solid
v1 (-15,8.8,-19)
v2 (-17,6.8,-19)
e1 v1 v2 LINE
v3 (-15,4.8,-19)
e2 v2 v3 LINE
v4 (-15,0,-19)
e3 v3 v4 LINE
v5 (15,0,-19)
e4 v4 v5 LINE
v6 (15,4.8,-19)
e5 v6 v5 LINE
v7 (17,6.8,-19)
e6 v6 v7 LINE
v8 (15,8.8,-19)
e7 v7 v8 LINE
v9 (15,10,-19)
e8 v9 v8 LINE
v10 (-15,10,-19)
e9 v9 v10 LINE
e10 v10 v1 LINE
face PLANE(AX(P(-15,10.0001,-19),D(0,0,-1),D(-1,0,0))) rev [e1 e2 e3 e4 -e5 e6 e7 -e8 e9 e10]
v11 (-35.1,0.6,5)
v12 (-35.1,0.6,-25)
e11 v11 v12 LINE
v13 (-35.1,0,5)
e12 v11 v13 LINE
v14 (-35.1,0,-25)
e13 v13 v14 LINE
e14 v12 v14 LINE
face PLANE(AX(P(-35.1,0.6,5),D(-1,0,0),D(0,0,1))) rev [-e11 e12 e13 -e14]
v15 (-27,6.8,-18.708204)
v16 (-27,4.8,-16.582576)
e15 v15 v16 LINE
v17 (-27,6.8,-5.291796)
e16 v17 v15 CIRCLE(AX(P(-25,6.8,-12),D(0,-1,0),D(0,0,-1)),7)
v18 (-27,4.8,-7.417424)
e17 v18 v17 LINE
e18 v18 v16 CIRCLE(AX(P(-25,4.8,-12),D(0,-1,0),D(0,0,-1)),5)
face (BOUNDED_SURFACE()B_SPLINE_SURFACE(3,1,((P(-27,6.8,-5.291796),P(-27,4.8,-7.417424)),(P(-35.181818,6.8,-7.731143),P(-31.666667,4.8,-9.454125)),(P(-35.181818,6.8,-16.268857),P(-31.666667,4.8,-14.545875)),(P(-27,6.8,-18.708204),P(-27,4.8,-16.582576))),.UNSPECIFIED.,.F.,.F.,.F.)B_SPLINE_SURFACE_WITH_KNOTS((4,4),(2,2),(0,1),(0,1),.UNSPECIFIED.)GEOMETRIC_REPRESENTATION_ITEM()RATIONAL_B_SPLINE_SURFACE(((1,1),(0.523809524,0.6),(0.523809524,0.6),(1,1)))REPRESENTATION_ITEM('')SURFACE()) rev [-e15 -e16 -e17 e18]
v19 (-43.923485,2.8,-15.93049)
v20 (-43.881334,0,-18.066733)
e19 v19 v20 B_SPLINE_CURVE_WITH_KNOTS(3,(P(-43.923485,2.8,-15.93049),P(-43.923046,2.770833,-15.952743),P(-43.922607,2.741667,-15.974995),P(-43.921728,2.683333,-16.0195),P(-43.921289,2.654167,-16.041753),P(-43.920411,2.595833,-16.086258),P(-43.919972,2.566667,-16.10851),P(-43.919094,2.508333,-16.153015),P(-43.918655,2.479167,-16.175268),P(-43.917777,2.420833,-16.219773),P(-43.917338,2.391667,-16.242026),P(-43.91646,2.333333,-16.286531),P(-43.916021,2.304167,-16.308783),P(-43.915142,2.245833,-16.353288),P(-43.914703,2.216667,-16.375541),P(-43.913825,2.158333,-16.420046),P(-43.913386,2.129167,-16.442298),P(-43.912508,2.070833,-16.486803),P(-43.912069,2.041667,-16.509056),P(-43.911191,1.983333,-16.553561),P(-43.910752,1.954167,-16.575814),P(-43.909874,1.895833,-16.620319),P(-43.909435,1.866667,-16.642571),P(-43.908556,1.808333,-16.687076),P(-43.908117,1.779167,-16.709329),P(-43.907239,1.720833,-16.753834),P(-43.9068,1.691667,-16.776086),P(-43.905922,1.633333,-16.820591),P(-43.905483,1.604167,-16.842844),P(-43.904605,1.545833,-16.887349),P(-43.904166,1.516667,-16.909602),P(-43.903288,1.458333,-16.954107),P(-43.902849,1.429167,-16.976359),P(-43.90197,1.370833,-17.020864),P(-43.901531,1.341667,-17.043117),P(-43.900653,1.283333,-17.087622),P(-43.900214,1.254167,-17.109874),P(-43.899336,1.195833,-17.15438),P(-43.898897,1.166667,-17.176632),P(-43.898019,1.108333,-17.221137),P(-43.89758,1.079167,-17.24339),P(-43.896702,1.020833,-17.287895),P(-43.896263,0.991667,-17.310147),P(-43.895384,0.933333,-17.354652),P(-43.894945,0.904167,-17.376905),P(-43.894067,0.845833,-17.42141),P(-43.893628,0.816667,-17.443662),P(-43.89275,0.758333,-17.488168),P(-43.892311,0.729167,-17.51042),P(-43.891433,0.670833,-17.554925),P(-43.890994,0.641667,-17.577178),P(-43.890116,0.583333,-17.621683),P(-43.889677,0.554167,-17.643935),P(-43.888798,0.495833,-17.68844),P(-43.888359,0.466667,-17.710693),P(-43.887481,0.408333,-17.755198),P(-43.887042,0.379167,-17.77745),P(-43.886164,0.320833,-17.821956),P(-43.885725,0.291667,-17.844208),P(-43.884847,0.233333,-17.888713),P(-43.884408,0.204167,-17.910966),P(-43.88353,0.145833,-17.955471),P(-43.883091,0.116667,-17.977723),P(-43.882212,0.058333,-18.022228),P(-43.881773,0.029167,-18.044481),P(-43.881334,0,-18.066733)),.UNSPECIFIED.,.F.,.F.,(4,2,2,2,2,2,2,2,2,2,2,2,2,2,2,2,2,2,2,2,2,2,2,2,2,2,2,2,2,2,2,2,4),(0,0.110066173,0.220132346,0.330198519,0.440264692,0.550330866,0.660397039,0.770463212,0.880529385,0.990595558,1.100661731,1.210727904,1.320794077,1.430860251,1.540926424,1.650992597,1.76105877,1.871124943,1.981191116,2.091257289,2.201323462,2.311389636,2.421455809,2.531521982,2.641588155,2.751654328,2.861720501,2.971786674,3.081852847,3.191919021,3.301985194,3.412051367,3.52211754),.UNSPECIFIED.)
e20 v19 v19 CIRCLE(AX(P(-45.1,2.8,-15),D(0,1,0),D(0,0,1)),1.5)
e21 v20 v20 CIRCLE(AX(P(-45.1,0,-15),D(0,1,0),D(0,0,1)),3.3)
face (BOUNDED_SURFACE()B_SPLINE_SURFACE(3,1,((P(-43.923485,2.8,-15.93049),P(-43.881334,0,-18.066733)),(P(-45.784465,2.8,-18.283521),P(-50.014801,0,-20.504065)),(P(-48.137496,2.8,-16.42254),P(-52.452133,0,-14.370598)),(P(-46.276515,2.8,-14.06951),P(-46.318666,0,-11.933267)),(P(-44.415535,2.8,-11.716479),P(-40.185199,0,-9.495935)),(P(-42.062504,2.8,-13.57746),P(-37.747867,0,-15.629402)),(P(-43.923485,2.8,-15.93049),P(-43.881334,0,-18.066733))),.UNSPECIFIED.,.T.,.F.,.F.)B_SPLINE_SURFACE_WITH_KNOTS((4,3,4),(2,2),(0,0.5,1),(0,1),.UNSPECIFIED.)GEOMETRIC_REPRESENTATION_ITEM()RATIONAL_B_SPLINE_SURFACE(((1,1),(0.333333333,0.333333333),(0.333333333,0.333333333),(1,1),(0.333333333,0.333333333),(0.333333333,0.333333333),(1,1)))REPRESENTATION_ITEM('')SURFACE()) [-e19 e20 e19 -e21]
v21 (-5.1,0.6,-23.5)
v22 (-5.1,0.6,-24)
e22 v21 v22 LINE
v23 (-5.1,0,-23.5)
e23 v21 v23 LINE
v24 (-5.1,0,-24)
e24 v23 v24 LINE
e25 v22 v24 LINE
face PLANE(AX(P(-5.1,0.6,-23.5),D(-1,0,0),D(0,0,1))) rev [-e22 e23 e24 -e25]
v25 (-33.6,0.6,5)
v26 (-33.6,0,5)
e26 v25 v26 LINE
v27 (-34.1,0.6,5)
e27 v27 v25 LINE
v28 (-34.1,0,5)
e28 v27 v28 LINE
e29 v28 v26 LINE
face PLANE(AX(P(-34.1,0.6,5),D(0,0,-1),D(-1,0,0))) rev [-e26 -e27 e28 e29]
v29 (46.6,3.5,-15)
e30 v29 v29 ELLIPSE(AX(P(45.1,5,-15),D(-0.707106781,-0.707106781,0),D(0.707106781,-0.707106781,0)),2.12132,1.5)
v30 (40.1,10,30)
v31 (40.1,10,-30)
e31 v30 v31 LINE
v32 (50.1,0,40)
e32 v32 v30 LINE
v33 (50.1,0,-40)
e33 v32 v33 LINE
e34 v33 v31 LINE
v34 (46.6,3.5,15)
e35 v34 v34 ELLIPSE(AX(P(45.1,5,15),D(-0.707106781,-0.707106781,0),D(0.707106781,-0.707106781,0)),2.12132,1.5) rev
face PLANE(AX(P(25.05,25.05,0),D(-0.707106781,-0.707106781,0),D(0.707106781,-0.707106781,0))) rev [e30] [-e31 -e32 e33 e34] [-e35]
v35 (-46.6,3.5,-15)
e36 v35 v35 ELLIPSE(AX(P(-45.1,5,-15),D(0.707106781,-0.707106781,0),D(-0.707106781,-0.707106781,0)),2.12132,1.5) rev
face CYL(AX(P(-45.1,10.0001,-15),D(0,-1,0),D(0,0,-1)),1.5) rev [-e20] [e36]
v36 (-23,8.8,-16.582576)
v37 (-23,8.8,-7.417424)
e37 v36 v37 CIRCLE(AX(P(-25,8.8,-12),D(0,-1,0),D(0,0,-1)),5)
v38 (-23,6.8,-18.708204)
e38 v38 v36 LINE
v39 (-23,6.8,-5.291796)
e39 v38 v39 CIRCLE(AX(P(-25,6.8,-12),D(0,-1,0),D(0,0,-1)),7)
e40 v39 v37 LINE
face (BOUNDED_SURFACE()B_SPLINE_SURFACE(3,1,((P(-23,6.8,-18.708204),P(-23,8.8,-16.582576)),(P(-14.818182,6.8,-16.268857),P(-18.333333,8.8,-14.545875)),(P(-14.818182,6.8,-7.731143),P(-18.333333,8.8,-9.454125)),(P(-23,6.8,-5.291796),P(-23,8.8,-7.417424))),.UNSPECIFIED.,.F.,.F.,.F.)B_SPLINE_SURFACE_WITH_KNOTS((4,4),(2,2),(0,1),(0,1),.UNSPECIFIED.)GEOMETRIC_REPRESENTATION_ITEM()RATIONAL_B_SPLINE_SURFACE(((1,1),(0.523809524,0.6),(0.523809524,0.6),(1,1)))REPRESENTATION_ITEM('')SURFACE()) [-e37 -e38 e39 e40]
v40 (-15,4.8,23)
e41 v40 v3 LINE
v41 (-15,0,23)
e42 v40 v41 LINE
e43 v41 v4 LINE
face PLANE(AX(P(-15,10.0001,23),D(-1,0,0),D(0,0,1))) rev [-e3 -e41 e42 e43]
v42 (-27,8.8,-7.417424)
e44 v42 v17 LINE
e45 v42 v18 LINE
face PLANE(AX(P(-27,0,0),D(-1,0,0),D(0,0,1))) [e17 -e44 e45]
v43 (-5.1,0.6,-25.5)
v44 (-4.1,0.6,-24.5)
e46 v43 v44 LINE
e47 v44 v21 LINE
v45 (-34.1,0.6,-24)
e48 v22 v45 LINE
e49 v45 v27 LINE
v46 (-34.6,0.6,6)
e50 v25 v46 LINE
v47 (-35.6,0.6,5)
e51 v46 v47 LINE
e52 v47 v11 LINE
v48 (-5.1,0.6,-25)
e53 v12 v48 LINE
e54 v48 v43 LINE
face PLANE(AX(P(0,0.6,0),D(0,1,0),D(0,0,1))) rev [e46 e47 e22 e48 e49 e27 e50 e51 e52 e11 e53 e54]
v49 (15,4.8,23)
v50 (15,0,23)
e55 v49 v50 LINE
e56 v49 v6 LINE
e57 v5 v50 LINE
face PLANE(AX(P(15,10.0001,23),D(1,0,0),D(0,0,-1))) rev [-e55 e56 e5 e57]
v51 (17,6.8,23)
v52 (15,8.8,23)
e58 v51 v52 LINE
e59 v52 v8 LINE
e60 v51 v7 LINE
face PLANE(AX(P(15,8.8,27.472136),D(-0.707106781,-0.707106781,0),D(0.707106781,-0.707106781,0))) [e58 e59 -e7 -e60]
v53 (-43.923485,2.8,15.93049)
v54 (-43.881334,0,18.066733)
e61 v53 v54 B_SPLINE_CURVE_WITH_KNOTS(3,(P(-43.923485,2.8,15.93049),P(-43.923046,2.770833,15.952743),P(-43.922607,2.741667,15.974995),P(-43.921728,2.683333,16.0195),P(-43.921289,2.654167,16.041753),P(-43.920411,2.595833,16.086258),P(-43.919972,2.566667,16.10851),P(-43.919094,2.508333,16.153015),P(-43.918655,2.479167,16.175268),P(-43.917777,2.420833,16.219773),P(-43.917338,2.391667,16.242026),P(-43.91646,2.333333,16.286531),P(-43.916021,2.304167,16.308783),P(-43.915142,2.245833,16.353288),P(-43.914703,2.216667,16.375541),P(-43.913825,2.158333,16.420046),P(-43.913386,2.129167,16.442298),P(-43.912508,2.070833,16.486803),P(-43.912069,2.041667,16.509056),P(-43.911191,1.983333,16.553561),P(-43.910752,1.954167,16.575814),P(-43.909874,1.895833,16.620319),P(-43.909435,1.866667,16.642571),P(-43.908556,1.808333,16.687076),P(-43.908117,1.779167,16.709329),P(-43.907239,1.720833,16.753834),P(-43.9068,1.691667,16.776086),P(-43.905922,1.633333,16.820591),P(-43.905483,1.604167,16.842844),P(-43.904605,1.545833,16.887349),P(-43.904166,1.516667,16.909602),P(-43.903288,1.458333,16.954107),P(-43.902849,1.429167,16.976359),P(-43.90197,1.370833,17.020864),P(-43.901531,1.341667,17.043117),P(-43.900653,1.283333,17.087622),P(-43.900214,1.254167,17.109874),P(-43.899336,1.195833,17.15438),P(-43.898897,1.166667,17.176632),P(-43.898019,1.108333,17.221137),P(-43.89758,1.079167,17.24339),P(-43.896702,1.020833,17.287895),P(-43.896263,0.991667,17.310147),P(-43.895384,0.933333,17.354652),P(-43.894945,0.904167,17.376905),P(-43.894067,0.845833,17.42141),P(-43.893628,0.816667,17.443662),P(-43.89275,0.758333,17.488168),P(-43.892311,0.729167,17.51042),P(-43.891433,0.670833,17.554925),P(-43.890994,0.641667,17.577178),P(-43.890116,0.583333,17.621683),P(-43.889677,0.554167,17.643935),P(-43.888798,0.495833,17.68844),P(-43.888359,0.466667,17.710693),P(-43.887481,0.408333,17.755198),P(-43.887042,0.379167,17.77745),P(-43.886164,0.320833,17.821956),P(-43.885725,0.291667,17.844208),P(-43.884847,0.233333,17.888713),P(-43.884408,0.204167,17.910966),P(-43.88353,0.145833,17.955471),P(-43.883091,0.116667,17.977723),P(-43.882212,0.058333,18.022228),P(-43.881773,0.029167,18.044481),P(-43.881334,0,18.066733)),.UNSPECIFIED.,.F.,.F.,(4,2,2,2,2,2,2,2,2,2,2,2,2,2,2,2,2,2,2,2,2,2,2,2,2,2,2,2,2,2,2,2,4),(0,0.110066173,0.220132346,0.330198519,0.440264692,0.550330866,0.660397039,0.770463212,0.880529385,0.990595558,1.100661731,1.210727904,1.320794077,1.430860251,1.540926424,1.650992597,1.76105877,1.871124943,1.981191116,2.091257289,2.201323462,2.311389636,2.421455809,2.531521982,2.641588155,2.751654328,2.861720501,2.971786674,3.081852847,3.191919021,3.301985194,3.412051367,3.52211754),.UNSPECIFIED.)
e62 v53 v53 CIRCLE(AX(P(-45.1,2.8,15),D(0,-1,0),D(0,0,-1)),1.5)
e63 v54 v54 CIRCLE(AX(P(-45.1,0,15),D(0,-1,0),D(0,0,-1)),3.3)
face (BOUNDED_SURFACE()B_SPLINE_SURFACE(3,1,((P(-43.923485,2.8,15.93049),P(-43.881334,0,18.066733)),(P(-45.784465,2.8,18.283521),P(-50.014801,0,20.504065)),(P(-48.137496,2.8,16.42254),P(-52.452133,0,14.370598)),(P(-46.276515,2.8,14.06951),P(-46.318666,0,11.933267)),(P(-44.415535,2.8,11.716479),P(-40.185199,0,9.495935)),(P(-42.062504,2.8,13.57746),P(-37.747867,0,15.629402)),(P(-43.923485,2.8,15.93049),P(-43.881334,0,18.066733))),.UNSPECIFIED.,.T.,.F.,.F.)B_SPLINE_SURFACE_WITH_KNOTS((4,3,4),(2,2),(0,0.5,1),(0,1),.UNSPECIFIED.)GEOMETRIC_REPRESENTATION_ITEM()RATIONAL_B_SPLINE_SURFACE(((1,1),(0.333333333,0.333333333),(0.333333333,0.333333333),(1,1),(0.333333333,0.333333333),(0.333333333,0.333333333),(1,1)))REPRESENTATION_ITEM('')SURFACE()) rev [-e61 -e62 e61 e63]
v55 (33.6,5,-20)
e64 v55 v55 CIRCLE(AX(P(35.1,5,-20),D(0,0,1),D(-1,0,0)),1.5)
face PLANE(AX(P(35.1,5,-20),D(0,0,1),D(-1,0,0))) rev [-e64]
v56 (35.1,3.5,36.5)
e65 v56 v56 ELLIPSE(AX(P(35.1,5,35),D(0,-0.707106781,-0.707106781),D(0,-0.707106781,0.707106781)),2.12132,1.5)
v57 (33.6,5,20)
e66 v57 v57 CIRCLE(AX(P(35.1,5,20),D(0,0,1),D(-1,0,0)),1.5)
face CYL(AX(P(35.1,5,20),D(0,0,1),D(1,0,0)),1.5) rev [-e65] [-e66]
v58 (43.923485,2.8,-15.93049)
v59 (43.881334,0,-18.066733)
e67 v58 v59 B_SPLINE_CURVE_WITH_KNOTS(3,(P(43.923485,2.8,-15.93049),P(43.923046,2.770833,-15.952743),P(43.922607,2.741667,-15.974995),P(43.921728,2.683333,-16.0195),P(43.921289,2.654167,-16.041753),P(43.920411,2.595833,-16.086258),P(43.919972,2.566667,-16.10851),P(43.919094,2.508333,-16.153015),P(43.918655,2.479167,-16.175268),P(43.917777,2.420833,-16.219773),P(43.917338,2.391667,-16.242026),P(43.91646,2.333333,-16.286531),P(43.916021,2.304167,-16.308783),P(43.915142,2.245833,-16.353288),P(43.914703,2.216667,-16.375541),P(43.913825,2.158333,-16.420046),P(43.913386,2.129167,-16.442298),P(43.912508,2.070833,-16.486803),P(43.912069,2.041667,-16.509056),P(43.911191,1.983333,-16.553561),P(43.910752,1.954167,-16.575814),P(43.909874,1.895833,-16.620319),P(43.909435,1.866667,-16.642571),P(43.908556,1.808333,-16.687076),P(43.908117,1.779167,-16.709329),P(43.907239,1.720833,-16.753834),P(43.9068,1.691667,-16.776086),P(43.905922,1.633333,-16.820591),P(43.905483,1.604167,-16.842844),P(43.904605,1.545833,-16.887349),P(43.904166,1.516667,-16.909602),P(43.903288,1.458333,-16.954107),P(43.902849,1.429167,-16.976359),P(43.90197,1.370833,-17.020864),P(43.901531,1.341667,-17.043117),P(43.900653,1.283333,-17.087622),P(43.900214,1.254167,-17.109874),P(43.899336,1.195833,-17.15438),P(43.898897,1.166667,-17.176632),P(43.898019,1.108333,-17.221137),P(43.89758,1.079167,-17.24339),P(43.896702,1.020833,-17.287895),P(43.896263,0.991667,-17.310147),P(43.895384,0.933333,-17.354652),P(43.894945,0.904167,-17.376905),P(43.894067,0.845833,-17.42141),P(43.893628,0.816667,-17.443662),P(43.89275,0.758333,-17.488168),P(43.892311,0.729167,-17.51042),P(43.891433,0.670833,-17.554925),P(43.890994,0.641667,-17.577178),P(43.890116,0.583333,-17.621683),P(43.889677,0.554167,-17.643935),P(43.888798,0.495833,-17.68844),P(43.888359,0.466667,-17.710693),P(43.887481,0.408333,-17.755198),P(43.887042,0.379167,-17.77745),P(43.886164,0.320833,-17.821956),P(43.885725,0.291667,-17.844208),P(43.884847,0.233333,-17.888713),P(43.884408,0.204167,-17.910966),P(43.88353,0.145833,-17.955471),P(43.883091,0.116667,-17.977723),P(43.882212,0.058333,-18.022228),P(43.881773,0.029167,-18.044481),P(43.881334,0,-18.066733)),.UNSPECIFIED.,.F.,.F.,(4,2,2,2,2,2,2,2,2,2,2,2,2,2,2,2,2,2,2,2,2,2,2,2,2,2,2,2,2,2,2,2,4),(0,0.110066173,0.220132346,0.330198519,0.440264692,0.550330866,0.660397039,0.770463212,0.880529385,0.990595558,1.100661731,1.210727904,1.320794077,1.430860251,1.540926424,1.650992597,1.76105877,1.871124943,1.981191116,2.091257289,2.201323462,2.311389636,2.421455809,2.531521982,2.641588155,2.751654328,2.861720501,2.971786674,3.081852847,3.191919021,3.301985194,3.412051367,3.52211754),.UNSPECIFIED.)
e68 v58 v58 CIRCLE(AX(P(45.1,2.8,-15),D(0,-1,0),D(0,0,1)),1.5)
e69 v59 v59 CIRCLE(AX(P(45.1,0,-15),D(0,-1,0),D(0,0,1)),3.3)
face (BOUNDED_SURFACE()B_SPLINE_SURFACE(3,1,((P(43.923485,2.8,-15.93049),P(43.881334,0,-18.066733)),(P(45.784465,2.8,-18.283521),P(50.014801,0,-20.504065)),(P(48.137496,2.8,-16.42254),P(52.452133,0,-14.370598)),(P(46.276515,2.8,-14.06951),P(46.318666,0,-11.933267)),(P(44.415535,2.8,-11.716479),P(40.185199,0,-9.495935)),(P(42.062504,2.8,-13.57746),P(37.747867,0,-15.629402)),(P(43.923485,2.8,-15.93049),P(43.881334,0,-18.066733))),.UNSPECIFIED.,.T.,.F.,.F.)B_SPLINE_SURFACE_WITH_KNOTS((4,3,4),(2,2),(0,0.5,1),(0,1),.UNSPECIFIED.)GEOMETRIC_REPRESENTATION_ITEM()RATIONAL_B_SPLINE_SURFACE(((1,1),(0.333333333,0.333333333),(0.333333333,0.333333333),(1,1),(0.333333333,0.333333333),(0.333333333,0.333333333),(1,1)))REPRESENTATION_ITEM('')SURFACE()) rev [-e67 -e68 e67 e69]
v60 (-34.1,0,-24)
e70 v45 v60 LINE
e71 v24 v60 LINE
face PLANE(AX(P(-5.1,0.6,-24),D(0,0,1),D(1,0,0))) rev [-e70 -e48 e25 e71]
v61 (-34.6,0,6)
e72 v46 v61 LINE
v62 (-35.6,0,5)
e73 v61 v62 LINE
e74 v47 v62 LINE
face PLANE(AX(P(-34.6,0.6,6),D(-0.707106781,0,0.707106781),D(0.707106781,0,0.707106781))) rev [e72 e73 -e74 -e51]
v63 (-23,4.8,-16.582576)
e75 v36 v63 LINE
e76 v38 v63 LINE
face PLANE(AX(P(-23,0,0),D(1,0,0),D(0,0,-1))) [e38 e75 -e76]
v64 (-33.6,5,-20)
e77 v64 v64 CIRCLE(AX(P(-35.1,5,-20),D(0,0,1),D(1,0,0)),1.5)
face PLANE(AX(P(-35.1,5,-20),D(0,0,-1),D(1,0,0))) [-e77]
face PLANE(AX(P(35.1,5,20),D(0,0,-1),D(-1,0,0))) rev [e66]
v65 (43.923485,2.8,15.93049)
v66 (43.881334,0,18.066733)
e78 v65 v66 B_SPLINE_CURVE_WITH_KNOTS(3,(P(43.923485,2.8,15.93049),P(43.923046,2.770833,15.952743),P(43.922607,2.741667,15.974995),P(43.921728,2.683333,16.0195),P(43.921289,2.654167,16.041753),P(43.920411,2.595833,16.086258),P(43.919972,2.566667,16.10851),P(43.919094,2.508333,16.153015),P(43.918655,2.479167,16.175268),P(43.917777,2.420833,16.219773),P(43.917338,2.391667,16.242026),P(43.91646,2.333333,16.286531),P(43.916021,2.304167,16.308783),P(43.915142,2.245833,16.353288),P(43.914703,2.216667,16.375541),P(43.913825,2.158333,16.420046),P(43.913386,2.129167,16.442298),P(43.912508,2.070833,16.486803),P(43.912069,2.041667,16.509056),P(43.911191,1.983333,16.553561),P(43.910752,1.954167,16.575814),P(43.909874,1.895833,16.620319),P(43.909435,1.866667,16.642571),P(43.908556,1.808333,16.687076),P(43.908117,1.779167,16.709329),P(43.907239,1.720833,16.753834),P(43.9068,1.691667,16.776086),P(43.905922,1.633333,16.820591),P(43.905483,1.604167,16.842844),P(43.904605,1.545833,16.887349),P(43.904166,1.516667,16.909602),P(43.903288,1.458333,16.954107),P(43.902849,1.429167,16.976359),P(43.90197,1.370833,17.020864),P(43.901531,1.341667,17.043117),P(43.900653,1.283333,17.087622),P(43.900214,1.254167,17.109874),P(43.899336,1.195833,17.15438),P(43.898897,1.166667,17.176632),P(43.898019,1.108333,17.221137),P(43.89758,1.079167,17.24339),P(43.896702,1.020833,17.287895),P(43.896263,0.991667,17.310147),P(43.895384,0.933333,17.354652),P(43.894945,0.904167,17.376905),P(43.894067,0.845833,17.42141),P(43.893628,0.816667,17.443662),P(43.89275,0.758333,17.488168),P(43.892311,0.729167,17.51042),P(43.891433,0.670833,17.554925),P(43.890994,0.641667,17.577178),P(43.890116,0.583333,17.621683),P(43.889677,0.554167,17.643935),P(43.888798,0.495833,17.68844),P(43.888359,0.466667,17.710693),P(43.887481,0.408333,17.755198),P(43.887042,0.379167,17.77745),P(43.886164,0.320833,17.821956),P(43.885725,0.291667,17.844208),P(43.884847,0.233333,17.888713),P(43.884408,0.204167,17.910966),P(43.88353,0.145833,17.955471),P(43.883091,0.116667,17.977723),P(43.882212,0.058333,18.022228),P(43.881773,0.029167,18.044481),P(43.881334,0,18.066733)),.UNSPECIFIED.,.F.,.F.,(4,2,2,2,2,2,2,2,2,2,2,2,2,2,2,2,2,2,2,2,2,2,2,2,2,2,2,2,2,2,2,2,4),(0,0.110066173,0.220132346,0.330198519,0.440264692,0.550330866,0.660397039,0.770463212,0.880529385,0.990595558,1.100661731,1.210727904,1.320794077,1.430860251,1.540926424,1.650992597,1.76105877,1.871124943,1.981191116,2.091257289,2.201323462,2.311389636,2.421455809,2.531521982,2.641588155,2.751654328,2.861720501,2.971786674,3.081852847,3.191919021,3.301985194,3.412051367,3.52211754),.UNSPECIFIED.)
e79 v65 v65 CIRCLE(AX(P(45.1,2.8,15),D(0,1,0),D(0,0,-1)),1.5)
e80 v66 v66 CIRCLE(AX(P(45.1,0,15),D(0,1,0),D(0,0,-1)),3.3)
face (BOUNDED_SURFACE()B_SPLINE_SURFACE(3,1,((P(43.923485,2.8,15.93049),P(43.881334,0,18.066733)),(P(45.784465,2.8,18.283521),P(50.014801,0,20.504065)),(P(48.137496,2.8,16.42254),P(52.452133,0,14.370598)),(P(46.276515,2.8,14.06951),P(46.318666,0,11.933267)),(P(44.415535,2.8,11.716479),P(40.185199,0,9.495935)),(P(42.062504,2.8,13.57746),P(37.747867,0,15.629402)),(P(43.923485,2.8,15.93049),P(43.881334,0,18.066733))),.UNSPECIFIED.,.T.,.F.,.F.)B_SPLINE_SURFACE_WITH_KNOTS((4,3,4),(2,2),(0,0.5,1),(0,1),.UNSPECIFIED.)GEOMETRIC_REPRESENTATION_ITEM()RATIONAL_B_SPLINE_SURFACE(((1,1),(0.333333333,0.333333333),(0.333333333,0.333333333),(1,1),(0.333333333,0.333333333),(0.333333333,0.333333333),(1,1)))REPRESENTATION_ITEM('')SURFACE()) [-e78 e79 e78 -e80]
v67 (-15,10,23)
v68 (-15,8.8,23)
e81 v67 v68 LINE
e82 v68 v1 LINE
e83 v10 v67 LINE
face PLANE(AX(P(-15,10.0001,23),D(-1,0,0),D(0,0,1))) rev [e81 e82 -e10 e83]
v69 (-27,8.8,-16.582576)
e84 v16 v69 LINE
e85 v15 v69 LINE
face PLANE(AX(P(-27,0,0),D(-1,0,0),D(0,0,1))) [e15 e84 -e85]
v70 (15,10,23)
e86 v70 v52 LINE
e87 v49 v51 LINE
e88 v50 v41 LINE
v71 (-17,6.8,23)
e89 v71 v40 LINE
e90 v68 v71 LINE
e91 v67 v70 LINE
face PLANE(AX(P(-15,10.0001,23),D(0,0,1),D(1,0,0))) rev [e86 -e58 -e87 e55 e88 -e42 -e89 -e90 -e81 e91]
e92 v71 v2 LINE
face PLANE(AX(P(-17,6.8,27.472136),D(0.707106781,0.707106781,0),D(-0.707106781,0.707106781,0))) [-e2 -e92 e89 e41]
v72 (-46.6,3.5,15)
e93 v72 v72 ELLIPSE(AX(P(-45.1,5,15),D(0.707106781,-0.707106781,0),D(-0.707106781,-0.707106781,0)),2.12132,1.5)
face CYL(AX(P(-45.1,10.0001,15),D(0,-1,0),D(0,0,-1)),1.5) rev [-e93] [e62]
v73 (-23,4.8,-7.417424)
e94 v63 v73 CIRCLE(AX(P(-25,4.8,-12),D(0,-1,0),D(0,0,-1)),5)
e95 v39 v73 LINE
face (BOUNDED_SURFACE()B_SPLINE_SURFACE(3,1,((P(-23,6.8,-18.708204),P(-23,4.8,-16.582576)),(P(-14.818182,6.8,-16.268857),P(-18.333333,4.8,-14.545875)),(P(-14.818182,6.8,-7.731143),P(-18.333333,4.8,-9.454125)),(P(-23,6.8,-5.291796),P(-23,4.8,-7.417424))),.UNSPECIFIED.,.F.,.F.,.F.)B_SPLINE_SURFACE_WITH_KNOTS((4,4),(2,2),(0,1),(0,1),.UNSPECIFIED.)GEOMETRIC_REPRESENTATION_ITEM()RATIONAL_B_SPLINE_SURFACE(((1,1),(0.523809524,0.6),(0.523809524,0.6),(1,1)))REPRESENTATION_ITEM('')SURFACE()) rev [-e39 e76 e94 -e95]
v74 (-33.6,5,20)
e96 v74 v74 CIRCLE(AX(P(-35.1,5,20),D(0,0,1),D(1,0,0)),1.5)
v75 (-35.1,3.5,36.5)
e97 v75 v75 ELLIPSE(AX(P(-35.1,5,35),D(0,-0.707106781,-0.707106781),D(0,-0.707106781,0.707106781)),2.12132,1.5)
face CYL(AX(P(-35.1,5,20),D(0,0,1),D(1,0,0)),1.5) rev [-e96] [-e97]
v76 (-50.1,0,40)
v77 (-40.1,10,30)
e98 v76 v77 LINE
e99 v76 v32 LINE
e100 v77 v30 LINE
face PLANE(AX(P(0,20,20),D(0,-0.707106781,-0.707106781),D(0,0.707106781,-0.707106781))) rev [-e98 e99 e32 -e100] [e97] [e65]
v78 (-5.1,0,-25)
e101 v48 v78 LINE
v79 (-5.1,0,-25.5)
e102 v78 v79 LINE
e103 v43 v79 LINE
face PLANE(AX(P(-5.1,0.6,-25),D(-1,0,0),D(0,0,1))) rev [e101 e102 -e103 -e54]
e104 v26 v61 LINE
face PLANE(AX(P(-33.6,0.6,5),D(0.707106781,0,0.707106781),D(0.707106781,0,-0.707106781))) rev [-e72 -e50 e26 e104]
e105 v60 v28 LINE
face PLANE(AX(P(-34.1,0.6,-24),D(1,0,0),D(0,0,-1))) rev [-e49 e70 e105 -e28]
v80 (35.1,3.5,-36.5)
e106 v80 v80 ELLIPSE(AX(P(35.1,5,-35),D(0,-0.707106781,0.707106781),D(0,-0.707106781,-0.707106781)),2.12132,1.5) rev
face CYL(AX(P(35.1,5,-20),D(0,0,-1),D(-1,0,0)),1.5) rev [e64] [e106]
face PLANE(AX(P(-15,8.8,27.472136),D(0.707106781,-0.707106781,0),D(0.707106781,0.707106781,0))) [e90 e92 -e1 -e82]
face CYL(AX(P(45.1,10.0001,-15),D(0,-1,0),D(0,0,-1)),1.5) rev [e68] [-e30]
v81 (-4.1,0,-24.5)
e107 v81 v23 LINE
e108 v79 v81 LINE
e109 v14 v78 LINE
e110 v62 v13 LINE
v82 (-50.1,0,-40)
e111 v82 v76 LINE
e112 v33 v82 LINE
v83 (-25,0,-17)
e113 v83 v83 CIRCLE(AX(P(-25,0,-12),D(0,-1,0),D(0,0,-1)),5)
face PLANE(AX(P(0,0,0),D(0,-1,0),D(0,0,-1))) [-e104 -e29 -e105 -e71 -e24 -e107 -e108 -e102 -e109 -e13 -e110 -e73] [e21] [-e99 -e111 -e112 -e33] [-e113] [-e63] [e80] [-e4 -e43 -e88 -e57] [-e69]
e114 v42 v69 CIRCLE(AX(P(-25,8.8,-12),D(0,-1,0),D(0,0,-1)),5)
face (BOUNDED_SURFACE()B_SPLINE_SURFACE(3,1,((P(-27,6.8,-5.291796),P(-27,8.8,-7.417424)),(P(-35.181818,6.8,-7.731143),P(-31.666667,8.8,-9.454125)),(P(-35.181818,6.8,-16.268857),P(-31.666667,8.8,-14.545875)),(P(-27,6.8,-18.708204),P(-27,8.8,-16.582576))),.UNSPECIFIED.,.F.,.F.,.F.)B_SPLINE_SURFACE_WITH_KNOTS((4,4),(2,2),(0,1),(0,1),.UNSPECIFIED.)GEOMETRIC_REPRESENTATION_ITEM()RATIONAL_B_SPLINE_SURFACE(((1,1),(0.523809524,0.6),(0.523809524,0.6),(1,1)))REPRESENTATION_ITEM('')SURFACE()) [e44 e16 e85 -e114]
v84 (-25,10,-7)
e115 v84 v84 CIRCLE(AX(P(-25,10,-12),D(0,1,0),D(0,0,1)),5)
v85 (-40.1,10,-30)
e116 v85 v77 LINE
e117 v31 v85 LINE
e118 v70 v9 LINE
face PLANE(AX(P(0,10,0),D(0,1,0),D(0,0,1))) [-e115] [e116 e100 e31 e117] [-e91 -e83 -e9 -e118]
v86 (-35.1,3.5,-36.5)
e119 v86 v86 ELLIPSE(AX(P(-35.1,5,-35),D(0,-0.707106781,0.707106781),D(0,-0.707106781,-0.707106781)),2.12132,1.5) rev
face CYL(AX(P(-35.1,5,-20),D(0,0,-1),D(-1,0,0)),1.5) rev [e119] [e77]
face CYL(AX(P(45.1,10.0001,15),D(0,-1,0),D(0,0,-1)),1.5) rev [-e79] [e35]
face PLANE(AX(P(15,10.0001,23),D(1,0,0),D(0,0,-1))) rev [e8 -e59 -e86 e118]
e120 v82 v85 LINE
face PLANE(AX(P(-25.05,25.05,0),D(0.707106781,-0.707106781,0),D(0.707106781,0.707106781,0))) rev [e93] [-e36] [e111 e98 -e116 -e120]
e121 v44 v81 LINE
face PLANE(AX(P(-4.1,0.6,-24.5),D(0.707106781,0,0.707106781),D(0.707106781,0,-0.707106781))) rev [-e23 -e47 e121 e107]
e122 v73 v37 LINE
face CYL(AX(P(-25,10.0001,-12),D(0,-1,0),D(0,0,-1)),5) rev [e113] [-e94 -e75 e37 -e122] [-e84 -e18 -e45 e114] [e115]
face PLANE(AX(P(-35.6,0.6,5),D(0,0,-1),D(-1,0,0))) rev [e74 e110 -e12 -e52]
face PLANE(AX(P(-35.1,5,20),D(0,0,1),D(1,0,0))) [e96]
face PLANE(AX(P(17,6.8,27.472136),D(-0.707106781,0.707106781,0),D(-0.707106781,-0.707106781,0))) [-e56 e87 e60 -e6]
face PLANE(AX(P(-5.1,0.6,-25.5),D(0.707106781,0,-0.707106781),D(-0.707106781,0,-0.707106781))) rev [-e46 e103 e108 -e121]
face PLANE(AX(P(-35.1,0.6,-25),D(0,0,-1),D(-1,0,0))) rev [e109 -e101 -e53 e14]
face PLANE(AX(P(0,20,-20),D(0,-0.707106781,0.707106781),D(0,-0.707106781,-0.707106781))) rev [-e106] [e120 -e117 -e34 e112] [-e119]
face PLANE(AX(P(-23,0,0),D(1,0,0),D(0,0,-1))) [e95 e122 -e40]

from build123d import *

# Parameters (mm, degrees)
SKETCH_4_R          = 1.5
CUT_EXTRUDE_1_DEPTH = 20
SKETCH_5_R          = 1.5
CUT_EXTRUDE_2_DEPTH = 65.884590004
SKETCH3_R           = 5
SKETCH3_W           = 30
SKETCH3_H           = 42
CUT_EXTRUDE1_DEPTH  = 65.884590004
CUT_EXTRUDE2_DEPTH  = 42
CUT_EXTRUDE_3_DEPTH = 0.6


with BuildPart() as part:
    # Эскиз1 → Loft 1 section 0
    with BuildSketch(Plane(origin=(0, 0, 0), x_dir=(1, 0, 0), z_dir=(0, 1, 0))):
        with BuildLine():
            Line((-50.1, -40), (50.1, -40))
            Line((50.1, -40), (50.1, 40))
            Line((50.1, 40), (-50.1, 40))
            Line((-50.1, 40), (-50.1, -40))
        make_face()
    # Эскиз2 → Loft 1 section 1
    with BuildSketch(Plane(origin=(0, 10, 0), x_dir=(1, 0, 0), z_dir=(0, 1, 0))):
        with BuildLine():
            Line((40.1, -30), (40.1, 30))
            Line((40.1, 30), (-40.1, 30))
            Line((-40.1, 30), (-40.1, -30))
            Line((-40.1, -30), (40.1, -30))
        make_face()
    loft()

    # Эскиз4 → Вырез-Вытянуть1 (cut)
    with BuildSketch(Plane.XY.offset(40)):
        with Locations((-35.1, 5)):
            Circle(SKETCH_4_R)
        with Locations(Location((35.1, 5, 0), (0, 0, 270))):
            Circle(SKETCH_4_R)
    cut_extrude_1 = extrude(amount=-CUT_EXTRUDE_1_DEPTH, mode=Mode.SUBTRACT)

    # Зеркальное отражение1: Вырез-Вытянуть1 across plane
    add(cut_extrude_1.mirror(Plane.XY), mode=Mode.SUBTRACT)

    # Эскиз5 → Вырез-Вытянуть2 (cut, through all)
    with BuildSketch(Plane.XZ):
        with Locations(Location((-45.1, 15, 0), (0, 0, 270))):
            Circle(SKETCH_5_R)
        with Locations(Location((-45.1, -15, 0), (0, 0, 180))):
            Circle(SKETCH_5_R)
        with Locations(Location((45.1, -15, 0), (0, 0, 270))):
            Circle(SKETCH_5_R)
        with Locations((45.1, 15)):
            Circle(SKETCH_5_R)
    extrude(amount=-CUT_EXTRUDE_2_DEPTH, mode=Mode.SUBTRACT)

    # Cut-Loft1: read off the stored shape, not the designer's step
    # Cut-Loft1: loft between two sections, ruled curve by curve
    cut_loft1_from = [
        Edge.make_bspline([(-43.923484762, 2.8, 15.930490137), (-45.784465036, 2.8, 18.283520613), (-48.137495512, 2.8, 16.422540339), (-46.276515238, 2.8, 14.069509863), (-44.415534964, 2.8, 11.716479387), (-42.062504488, 2.8, 13.577459661), (-43.923484762, 2.8, 15.930490137)], [0, 0, 0, 0, 0.5, 0.5, 0.5, 1, 1, 1, 1], 3, [1, 0.333333333, 0.333333333, 1, 0.333333333, 0.333333333, 1]),
    ]
    cut_loft1_to = [
        Edge.make_bspline([(-43.881334244, 0, 18.066733405), (-50.014801053, 0, 20.504064917), (-52.452132565, 0, 14.370598107), (-46.318665756, 0, 11.933266595), (-40.185198947, 0, 9.495935083), (-37.747867435, 0, 15.629401893), (-43.881334244, 0, 18.066733405)], [0, 0, 0, 0, 0.5, 0.5, 0.5, 1, 1, 1, 1], 3, [1, 0.333333333, 0.333333333, 1, 0.333333333, 0.333333333, 1]),
    ]
    cut_loft1 = Solid(Shell([*[Face.make_surface_from_curves(cut_loft1_from[k], cut_loft1_to[k]) for k in range(1)], Face(Wire(cut_loft1_from)), Face(Wire(cut_loft1_to))]))
    add(cut_loft1, mode=Mode.SUBTRACT)

    # Mirror1: Cut-Loft1 across plane
    add(cut_loft1.mirror(Plane.XY), mode=Mode.SUBTRACT)

    # Mirror2: read off the stored shape, not the designer's step
    # Mirror2: loft between two sections, ruled curve by curve
    mirror2_from = [
        Edge.make_bspline([(43.923484762, 2.8, 15.930490137), (45.784465036, 2.8, 18.283520613), (48.137495512, 2.8, 16.422540339), (46.276515238, 2.8, 14.069509863), (44.415534964, 2.8, 11.716479387), (42.062504488, 2.8, 13.577459661), (43.923484762, 2.8, 15.930490137)], [0, 0, 0, 0, 0.5, 0.5, 0.5, 1, 1, 1, 1], 3, [1, 0.333333333, 0.333333333, 1, 0.333333333, 0.333333333, 1]),
    ]
    mirror2_to = [
        Edge.make_bspline([(43.881334244, 0, 18.066733405), (50.014801053, 0, 20.504064917), (52.452132565, 0, 14.370598107), (46.318665756, 0, 11.933266595), (40.185198947, 0, 9.495935083), (37.747867435, 0, 15.629401893), (43.881334244, 0, 18.066733405)], [0, 0, 0, 0, 0.5, 0.5, 0.5, 1, 1, 1, 1], 3, [1, 0.333333333, 0.333333333, 1, 0.333333333, 0.333333333, 1]),
    ]
    mirror2 = Solid(Shell([*[Face.make_surface_from_curves(mirror2_from[k], mirror2_to[k]) for k in range(1)], Face(Wire(mirror2_from)), Face(Wire(mirror2_to))]))
    add(mirror2, mode=Mode.SUBTRACT)

    # Mirror2 2: loft between two sections, ruled curve by curve
    mirror2_2_from = [
        Edge.make_bspline([(43.923484762, 2.8, -15.930490137), (45.784465036, 2.8, -18.283520613), (48.137495512, 2.8, -16.422540339), (46.276515238, 2.8, -14.069509863), (44.415534964, 2.8, -11.716479387), (42.062504488, 2.8, -13.577459661), (43.923484762, 2.8, -15.930490137)], [0, 0, 0, 0, 0.5, 0.5, 0.5, 1, 1, 1, 1], 3, [1, 0.333333333, 0.333333333, 1, 0.333333333, 0.333333333, 1]),
    ]
    mirror2_2_to = [
        Edge.make_bspline([(43.881334244, 0, -18.066733405), (50.014801053, 0, -20.504064917), (52.452132565, 0, -14.370598107), (46.318665756, 0, -11.933266595), (40.185198947, 0, -9.495935083), (37.747867435, 0, -15.629401893), (43.881334244, 0, -18.066733405)], [0, 0, 0, 0, 0.5, 0.5, 0.5, 1, 1, 1, 1], 3, [1, 0.333333333, 0.333333333, 1, 0.333333333, 0.333333333, 1]),
    ]
    mirror2_2 = Solid(Shell([*[Face.make_surface_from_curves(mirror2_2_from[k], mirror2_2_to[k]) for k in range(1)], Face(Wire(mirror2_2_from)), Face(Wire(mirror2_2_to))]))
    add(mirror2_2, mode=Mode.SUBTRACT)

    # Sketch3 → Cut-Extrude1 (cut, through all)
    with BuildSketch(Plane.XZ):
        with Locations(Location((-25, -12, 0), (0, 0, 270))):
            Circle(SKETCH3_R)
        with Locations((0, 2)):
            Rectangle(SKETCH3_W, SKETCH3_H)
    extrude(amount=-CUT_EXTRUDE1_DEPTH, mode=Mode.SUBTRACT)

    # Sketch4 → Cut-Extrude2 (cut)
    with BuildSketch(Plane.XY.offset(-19)):
        Polygon((-15, 8.8), (-17, 6.8), (-15, 4.8), align=None)
        Polygon((15, 4.8), (15, 8.8), (17, 6.8), align=None)
    extrude(amount=CUT_EXTRUDE2_DEPTH, mode=Mode.SUBTRACT)

    # Loft 1 2: read off the stored shape, not the designer's step
    # Loft 1 2: loft between two sections, ruled curve by curve
    loft_1_2_from = [
        Edge.make_bspline([(-23, 6.8, -18.708203932), (-14.818181818, 6.8, -16.268857048), (-14.818181818, 6.8, -7.731142952), (-23, 6.8, -5.291796068)], [0, 0, 0, 0, 1, 1, 1, 1], 3, [1, 0.523809524, 0.523809524, 1]),
        Edge.make_line((-23, 6.8, -5.291796068), (-23, 6.8, -18.708203932)),
    ]
    loft_1_2_to = [
        Edge.make_bspline([(-23, 4.8, -16.582575695), (-18.333333333, 4.8, -14.545875386), (-18.333333333, 4.8, -9.454124614), (-23, 4.8, -7.417424305)], [0, 0, 0, 0, 1, 1, 1, 1], 3, [1, 0.6, 0.6, 1]),
        Edge.make_line((-23, 4.8, -7.417424305), (-23, 4.8, -16.582575695)),
    ]
    loft_1_2 = Solid(Shell([*[Face.make_surface_from_curves(loft_1_2_from[k], loft_1_2_to[k]) for k in range(2)], Face(Wire(loft_1_2_from)), Face(Wire(loft_1_2_to))]))
    add(loft_1_2, mode=Mode.SUBTRACT)

    # Вырез-По сечениям2: read off the stored shape, not the designer's step
    # Вырез-По сечениям2: loft between two sections, ruled curve by curve
    loft_2_from = [
        Edge.make_bspline([(-27, 6.8, -5.291796068), (-35.181818182, 6.8, -7.731142952), (-35.181818182, 6.8, -16.268857048), (-27, 6.8, -18.708203932)], [0, 0, 0, 0, 1, 1, 1, 1], 3, [1, 0.523809524, 0.523809524, 1]),
        Edge.make_line((-27, 6.8, -18.708203932), (-27, 6.8, -5.291796068)),
    ]
    loft_2_to = [
        Edge.make_bspline([(-27, 4.8, -7.417424305), (-31.666666667, 4.8, -9.454124614), (-31.666666667, 4.8, -14.545875386), (-27, 4.8, -16.582575695)], [0, 0, 0, 0, 1, 1, 1, 1], 3, [1, 0.6, 0.6, 1]),
        Edge.make_line((-27, 4.8, -16.582575695), (-27, 4.8, -7.417424305)),
    ]
    loft_2 = Solid(Shell([*[Face.make_surface_from_curves(loft_2_from[k], loft_2_to[k]) for k in range(2)], Face(Wire(loft_2_from)), Face(Wire(loft_2_to))]))
    add(loft_2, mode=Mode.SUBTRACT)

    # Зеркальное отражение2: Loft 1 2, Вырез-По сечениям2 across plane
    add(loft_1_2.mirror(Plane(origin=(0, 6.8, 0), x_dir=(0, 0, 1), z_dir=(0, -1, 0))), mode=Mode.SUBTRACT)
    add(loft_2.mirror(Plane(origin=(0, 6.8, 0), x_dir=(0, 0, 1), z_dir=(0, -1, 0))), mode=Mode.SUBTRACT)

    # Эскиз8 → Вырез-Вытянуть3 (cut)
    with BuildSketch(Plane.XZ):
        Polygon((-35.1, 5), (-35.1, -25), (-5.1, -25), (-5.1, -25.5), (-4.1, -24.5), (-5.1, -23.5), (-5.1, -24), (-34.1, -24), (-34.1, 5), (-33.6, 5), (-34.6, 6), (-35.6, 5), align=None)
    extrude(amount=-CUT_EXTRUDE_3_DEPTH, mode=Mode.SUBTRACT)


solid = part.part
